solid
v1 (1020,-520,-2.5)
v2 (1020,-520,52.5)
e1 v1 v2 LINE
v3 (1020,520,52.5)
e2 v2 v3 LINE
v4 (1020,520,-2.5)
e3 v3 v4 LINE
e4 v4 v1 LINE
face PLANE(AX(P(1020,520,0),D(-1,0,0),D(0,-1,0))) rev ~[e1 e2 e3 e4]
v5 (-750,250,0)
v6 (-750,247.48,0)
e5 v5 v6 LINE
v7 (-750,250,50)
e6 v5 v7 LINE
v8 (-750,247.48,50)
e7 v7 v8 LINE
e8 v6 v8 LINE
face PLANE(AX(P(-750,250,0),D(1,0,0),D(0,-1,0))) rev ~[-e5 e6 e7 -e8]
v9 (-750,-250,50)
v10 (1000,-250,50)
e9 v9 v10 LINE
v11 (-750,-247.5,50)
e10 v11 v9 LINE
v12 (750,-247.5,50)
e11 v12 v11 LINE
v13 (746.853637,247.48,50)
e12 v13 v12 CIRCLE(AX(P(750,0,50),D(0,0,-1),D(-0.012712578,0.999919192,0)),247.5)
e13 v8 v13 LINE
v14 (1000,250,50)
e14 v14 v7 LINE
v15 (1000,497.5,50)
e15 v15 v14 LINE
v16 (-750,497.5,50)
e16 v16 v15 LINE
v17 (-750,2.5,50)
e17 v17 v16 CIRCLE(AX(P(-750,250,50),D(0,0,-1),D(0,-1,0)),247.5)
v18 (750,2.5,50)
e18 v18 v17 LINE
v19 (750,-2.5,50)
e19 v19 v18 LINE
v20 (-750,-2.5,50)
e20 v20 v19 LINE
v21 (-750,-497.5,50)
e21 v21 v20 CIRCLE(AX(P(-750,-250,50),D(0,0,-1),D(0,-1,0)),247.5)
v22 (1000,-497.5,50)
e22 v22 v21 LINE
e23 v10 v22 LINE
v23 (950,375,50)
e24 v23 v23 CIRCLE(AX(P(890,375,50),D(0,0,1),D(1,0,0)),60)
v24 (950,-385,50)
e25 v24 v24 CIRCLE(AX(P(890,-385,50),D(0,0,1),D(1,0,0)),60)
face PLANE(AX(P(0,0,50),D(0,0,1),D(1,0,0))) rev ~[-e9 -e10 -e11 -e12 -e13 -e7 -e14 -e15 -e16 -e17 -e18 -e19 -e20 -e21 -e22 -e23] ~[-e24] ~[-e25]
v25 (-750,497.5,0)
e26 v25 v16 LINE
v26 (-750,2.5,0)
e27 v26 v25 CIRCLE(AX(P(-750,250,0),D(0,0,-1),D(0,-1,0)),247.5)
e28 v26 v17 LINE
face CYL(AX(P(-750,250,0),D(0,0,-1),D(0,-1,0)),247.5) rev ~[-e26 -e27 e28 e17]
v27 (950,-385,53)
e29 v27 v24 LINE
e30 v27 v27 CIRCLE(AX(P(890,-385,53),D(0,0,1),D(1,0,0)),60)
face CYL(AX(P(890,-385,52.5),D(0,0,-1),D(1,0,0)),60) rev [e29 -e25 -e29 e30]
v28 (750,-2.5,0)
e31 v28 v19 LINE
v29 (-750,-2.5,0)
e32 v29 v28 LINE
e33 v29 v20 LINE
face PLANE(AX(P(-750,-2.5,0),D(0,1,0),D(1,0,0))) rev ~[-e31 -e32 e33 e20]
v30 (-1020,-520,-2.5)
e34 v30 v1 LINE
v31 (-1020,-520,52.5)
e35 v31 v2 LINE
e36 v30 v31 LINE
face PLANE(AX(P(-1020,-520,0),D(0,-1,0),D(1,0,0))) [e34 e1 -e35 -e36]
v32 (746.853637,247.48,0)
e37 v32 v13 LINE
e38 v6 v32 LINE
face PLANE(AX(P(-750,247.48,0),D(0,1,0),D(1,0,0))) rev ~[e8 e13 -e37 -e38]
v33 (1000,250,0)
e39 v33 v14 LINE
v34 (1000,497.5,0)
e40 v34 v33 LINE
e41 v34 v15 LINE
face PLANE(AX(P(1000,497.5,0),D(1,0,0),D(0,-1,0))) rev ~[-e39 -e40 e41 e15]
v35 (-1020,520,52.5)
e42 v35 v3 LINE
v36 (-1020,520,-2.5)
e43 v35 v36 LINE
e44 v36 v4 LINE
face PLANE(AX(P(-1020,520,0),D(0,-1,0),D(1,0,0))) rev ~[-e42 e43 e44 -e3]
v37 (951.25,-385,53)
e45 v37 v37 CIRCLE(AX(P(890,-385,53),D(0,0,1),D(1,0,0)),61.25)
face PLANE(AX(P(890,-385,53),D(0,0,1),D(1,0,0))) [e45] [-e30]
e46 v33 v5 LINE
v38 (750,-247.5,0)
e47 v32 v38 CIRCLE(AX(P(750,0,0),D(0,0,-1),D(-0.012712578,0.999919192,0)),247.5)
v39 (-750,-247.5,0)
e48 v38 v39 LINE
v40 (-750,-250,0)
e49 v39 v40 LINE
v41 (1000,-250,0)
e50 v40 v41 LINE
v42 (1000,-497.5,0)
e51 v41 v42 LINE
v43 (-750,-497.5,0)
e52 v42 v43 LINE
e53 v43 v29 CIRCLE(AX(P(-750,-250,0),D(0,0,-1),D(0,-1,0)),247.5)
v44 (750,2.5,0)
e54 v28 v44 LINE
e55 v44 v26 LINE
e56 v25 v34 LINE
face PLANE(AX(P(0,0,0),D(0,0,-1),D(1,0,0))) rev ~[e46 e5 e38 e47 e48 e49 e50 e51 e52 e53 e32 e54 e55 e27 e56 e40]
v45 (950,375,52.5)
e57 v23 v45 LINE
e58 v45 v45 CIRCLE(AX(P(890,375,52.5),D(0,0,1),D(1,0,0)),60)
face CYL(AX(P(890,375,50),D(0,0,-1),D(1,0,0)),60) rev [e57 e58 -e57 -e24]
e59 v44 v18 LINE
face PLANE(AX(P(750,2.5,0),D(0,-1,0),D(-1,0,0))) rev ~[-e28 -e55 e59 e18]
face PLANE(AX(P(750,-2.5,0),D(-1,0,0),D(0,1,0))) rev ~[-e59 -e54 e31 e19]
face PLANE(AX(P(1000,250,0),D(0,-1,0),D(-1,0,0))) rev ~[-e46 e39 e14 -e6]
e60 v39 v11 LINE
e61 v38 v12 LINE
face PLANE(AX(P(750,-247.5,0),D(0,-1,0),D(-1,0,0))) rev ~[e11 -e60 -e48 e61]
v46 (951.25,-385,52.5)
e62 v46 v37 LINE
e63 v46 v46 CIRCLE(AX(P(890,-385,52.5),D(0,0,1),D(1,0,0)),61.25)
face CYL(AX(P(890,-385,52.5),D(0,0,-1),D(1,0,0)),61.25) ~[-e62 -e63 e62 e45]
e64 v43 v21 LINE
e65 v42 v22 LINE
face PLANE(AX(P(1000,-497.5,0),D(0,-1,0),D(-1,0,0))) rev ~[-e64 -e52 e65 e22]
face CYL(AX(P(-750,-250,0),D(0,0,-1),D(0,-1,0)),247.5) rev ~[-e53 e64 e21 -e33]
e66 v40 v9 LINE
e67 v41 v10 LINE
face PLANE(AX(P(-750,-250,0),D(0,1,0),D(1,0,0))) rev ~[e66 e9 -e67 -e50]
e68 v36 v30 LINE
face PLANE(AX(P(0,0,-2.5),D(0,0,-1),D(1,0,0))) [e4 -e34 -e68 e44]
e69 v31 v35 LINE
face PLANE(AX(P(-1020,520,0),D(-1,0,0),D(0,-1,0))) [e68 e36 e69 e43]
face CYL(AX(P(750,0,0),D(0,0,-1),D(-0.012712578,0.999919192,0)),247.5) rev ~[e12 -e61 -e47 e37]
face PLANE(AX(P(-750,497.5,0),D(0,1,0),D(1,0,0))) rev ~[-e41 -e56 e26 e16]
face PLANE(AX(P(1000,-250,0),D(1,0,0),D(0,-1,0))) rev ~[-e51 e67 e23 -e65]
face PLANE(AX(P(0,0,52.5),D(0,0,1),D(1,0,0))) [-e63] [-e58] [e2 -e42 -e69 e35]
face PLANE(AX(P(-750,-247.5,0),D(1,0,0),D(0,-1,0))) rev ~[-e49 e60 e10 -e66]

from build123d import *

# Parameters (mm, degrees)
F0_W     = 2040
F0_H     = 1040
F1_DEPTH = 50
F2_W     = 2040
F2_H     = 1040
F2_R     = 60
F3_DEPTH = 2.5
F4_W     = 2040
F4_H     = 1040
F5_DEPTH = 2.5
F6_R     = 61.25
F6_R_2   = 60
F7_DEPTH = 0.5


with BuildPart() as f1:
    # F0 (on Top) → F1 (new body)
    with BuildSketch(Plane.XY):
        Rectangle(F0_W, F0_H)
        Polygon((-1000, 250), (-1000, 500), (-750, 500), (1000, 500), (1000, 497.5), (1000, 250), (1000, -2.028e-07), (1000, -250), (1000, -497.5), (1000, -500), (-750, -500), (-1000, -500), (-1000, -250.0000003493), align=None, mode=Mode.SUBTRACT)
        with BuildLine():
            ThreePointArc((-750, -500), (-926.7766951731, -426.7766954201), (-1000, -250.0000003493))
            Line((-1000, -250.0000003493), (-1000, -500))
            Line((-1000, -500), (-750, -500))
        make_face()
        with BuildLine():
            ThreePointArc((-750, 0), (-926.7766952966, 73.2233047034), (-1000, 250))
            Line((-1000, 250), (-1000, -250.0000003493))
            ThreePointArc((-1000, -250.0000003493), (-926.7766954201, -73.2233048269), (-750, 0))
        make_face()
        with BuildLine():
            Line((-750, 500), (-1000, 500))
            Line((-1000, 500), (-1000, 250))
            ThreePointArc((-1000, 250), (-926.7766952966, 426.7766952966), (-750, 500))
        make_face()
        with BuildLine():
            Line((1000, -2.028e-07), (1000, 250))
            Line((1000, 250), (750, 250))
            ThreePointArc((750, 250), (926.7766953683, 176.7766952249), (1000, -2.028e-07))
        make_face()
        with BuildLine():
            Line((1000, -250), (1000, -2.028e-07))
            ThreePointArc((1000, -2.028e-07), (926.7766952249, -176.7766953683), (750, -250))
            Line((750, -250), (1000, -250))
        make_face()
        with BuildLine():
            ThreePointArc((750, -250), (926.7766952249, -176.7766953683), (1000, -2.028e-07))
            ThreePointArc((1000, -2.028e-07), (926.7766953683, 176.7766952249), (750, 250))
            Line((750, 250), (-750, 250))
            Line((-750, 250), (-750, 247.48))
            Line((-750, 247.48), (746.8536370203, 247.48))
            ThreePointArc((746.8536370203, 247.48), (997.4949999495, 1.5732132723), (750, -247.5))
            Line((750, -247.5), (-750, -247.5))
            Line((-750, -247.5), (-750, -250))
            Line((-750, -250), (750, -250))
        make_face()
        with BuildLine():
            Line((1000, 500), (-750, 500))
            ThreePointArc((-750, 500), (-926.7766952966, 426.7766952966), (-1000, 250))
            ThreePointArc((-1000, 250), (-926.7766952966, 73.2233047034), (-750, 0))
            ThreePointArc((-750, 0), (-926.7766954201, -73.2233048269), (-1000, -250.0000003493))
            ThreePointArc((-1000, -250.0000003493), (-926.7766951731, -426.7766954201), (-750, -500))
            Line((-750, -500), (1000, -500))
            Line((1000, -500), (1000, -497.5))
            Line((1000, -497.5), (-750, -497.5))
            ThreePointArc((-750, -497.5), (-997.5, -250), (-750, -2.5))
            Line((-750, -2.5), (750, -2.5))
            Line((750, -2.5), (750, 2.5))
            Line((750, 2.5), (-750, 2.5))
            ThreePointArc((-750, 2.5), (-997.5, 250), (-750, 497.5))
            Line((-750, 497.5), (1000, 497.5))
            Line((1000, 497.5), (1000, 500))
        make_face()
    extrude(amount=F1_DEPTH)

    # F2 (on face) → F3 (join)
    with BuildSketch(Plane.XY.offset(50)):
        Rectangle(F2_W, F2_H)
        with Locations((890, -385)):
            Circle(F2_R, mode=Mode.SUBTRACT)
        with Locations((890, 375)):
            Circle(F2_R, mode=Mode.SUBTRACT)
    extrude(amount=F3_DEPTH)

    # F4 (on face) → F5 (join)
    with BuildSketch(Plane(origin=(0, 0, 0), x_dir=(1, 0, 0), z_dir=(0, 0, -1))):
        Rectangle(F4_W, F4_H)
    extrude(amount=F5_DEPTH)

    # F6 (on face) → F7 (join)
    with BuildSketch(Plane.XY.offset(52.5)):
        with Locations((890, -385)):
            Circle(F6_R)
        with Locations((890, -385)):
            Circle(F6_R_2, mode=Mode.SUBTRACT)
    extrude(amount=F7_DEPTH)


solid = f1.part
